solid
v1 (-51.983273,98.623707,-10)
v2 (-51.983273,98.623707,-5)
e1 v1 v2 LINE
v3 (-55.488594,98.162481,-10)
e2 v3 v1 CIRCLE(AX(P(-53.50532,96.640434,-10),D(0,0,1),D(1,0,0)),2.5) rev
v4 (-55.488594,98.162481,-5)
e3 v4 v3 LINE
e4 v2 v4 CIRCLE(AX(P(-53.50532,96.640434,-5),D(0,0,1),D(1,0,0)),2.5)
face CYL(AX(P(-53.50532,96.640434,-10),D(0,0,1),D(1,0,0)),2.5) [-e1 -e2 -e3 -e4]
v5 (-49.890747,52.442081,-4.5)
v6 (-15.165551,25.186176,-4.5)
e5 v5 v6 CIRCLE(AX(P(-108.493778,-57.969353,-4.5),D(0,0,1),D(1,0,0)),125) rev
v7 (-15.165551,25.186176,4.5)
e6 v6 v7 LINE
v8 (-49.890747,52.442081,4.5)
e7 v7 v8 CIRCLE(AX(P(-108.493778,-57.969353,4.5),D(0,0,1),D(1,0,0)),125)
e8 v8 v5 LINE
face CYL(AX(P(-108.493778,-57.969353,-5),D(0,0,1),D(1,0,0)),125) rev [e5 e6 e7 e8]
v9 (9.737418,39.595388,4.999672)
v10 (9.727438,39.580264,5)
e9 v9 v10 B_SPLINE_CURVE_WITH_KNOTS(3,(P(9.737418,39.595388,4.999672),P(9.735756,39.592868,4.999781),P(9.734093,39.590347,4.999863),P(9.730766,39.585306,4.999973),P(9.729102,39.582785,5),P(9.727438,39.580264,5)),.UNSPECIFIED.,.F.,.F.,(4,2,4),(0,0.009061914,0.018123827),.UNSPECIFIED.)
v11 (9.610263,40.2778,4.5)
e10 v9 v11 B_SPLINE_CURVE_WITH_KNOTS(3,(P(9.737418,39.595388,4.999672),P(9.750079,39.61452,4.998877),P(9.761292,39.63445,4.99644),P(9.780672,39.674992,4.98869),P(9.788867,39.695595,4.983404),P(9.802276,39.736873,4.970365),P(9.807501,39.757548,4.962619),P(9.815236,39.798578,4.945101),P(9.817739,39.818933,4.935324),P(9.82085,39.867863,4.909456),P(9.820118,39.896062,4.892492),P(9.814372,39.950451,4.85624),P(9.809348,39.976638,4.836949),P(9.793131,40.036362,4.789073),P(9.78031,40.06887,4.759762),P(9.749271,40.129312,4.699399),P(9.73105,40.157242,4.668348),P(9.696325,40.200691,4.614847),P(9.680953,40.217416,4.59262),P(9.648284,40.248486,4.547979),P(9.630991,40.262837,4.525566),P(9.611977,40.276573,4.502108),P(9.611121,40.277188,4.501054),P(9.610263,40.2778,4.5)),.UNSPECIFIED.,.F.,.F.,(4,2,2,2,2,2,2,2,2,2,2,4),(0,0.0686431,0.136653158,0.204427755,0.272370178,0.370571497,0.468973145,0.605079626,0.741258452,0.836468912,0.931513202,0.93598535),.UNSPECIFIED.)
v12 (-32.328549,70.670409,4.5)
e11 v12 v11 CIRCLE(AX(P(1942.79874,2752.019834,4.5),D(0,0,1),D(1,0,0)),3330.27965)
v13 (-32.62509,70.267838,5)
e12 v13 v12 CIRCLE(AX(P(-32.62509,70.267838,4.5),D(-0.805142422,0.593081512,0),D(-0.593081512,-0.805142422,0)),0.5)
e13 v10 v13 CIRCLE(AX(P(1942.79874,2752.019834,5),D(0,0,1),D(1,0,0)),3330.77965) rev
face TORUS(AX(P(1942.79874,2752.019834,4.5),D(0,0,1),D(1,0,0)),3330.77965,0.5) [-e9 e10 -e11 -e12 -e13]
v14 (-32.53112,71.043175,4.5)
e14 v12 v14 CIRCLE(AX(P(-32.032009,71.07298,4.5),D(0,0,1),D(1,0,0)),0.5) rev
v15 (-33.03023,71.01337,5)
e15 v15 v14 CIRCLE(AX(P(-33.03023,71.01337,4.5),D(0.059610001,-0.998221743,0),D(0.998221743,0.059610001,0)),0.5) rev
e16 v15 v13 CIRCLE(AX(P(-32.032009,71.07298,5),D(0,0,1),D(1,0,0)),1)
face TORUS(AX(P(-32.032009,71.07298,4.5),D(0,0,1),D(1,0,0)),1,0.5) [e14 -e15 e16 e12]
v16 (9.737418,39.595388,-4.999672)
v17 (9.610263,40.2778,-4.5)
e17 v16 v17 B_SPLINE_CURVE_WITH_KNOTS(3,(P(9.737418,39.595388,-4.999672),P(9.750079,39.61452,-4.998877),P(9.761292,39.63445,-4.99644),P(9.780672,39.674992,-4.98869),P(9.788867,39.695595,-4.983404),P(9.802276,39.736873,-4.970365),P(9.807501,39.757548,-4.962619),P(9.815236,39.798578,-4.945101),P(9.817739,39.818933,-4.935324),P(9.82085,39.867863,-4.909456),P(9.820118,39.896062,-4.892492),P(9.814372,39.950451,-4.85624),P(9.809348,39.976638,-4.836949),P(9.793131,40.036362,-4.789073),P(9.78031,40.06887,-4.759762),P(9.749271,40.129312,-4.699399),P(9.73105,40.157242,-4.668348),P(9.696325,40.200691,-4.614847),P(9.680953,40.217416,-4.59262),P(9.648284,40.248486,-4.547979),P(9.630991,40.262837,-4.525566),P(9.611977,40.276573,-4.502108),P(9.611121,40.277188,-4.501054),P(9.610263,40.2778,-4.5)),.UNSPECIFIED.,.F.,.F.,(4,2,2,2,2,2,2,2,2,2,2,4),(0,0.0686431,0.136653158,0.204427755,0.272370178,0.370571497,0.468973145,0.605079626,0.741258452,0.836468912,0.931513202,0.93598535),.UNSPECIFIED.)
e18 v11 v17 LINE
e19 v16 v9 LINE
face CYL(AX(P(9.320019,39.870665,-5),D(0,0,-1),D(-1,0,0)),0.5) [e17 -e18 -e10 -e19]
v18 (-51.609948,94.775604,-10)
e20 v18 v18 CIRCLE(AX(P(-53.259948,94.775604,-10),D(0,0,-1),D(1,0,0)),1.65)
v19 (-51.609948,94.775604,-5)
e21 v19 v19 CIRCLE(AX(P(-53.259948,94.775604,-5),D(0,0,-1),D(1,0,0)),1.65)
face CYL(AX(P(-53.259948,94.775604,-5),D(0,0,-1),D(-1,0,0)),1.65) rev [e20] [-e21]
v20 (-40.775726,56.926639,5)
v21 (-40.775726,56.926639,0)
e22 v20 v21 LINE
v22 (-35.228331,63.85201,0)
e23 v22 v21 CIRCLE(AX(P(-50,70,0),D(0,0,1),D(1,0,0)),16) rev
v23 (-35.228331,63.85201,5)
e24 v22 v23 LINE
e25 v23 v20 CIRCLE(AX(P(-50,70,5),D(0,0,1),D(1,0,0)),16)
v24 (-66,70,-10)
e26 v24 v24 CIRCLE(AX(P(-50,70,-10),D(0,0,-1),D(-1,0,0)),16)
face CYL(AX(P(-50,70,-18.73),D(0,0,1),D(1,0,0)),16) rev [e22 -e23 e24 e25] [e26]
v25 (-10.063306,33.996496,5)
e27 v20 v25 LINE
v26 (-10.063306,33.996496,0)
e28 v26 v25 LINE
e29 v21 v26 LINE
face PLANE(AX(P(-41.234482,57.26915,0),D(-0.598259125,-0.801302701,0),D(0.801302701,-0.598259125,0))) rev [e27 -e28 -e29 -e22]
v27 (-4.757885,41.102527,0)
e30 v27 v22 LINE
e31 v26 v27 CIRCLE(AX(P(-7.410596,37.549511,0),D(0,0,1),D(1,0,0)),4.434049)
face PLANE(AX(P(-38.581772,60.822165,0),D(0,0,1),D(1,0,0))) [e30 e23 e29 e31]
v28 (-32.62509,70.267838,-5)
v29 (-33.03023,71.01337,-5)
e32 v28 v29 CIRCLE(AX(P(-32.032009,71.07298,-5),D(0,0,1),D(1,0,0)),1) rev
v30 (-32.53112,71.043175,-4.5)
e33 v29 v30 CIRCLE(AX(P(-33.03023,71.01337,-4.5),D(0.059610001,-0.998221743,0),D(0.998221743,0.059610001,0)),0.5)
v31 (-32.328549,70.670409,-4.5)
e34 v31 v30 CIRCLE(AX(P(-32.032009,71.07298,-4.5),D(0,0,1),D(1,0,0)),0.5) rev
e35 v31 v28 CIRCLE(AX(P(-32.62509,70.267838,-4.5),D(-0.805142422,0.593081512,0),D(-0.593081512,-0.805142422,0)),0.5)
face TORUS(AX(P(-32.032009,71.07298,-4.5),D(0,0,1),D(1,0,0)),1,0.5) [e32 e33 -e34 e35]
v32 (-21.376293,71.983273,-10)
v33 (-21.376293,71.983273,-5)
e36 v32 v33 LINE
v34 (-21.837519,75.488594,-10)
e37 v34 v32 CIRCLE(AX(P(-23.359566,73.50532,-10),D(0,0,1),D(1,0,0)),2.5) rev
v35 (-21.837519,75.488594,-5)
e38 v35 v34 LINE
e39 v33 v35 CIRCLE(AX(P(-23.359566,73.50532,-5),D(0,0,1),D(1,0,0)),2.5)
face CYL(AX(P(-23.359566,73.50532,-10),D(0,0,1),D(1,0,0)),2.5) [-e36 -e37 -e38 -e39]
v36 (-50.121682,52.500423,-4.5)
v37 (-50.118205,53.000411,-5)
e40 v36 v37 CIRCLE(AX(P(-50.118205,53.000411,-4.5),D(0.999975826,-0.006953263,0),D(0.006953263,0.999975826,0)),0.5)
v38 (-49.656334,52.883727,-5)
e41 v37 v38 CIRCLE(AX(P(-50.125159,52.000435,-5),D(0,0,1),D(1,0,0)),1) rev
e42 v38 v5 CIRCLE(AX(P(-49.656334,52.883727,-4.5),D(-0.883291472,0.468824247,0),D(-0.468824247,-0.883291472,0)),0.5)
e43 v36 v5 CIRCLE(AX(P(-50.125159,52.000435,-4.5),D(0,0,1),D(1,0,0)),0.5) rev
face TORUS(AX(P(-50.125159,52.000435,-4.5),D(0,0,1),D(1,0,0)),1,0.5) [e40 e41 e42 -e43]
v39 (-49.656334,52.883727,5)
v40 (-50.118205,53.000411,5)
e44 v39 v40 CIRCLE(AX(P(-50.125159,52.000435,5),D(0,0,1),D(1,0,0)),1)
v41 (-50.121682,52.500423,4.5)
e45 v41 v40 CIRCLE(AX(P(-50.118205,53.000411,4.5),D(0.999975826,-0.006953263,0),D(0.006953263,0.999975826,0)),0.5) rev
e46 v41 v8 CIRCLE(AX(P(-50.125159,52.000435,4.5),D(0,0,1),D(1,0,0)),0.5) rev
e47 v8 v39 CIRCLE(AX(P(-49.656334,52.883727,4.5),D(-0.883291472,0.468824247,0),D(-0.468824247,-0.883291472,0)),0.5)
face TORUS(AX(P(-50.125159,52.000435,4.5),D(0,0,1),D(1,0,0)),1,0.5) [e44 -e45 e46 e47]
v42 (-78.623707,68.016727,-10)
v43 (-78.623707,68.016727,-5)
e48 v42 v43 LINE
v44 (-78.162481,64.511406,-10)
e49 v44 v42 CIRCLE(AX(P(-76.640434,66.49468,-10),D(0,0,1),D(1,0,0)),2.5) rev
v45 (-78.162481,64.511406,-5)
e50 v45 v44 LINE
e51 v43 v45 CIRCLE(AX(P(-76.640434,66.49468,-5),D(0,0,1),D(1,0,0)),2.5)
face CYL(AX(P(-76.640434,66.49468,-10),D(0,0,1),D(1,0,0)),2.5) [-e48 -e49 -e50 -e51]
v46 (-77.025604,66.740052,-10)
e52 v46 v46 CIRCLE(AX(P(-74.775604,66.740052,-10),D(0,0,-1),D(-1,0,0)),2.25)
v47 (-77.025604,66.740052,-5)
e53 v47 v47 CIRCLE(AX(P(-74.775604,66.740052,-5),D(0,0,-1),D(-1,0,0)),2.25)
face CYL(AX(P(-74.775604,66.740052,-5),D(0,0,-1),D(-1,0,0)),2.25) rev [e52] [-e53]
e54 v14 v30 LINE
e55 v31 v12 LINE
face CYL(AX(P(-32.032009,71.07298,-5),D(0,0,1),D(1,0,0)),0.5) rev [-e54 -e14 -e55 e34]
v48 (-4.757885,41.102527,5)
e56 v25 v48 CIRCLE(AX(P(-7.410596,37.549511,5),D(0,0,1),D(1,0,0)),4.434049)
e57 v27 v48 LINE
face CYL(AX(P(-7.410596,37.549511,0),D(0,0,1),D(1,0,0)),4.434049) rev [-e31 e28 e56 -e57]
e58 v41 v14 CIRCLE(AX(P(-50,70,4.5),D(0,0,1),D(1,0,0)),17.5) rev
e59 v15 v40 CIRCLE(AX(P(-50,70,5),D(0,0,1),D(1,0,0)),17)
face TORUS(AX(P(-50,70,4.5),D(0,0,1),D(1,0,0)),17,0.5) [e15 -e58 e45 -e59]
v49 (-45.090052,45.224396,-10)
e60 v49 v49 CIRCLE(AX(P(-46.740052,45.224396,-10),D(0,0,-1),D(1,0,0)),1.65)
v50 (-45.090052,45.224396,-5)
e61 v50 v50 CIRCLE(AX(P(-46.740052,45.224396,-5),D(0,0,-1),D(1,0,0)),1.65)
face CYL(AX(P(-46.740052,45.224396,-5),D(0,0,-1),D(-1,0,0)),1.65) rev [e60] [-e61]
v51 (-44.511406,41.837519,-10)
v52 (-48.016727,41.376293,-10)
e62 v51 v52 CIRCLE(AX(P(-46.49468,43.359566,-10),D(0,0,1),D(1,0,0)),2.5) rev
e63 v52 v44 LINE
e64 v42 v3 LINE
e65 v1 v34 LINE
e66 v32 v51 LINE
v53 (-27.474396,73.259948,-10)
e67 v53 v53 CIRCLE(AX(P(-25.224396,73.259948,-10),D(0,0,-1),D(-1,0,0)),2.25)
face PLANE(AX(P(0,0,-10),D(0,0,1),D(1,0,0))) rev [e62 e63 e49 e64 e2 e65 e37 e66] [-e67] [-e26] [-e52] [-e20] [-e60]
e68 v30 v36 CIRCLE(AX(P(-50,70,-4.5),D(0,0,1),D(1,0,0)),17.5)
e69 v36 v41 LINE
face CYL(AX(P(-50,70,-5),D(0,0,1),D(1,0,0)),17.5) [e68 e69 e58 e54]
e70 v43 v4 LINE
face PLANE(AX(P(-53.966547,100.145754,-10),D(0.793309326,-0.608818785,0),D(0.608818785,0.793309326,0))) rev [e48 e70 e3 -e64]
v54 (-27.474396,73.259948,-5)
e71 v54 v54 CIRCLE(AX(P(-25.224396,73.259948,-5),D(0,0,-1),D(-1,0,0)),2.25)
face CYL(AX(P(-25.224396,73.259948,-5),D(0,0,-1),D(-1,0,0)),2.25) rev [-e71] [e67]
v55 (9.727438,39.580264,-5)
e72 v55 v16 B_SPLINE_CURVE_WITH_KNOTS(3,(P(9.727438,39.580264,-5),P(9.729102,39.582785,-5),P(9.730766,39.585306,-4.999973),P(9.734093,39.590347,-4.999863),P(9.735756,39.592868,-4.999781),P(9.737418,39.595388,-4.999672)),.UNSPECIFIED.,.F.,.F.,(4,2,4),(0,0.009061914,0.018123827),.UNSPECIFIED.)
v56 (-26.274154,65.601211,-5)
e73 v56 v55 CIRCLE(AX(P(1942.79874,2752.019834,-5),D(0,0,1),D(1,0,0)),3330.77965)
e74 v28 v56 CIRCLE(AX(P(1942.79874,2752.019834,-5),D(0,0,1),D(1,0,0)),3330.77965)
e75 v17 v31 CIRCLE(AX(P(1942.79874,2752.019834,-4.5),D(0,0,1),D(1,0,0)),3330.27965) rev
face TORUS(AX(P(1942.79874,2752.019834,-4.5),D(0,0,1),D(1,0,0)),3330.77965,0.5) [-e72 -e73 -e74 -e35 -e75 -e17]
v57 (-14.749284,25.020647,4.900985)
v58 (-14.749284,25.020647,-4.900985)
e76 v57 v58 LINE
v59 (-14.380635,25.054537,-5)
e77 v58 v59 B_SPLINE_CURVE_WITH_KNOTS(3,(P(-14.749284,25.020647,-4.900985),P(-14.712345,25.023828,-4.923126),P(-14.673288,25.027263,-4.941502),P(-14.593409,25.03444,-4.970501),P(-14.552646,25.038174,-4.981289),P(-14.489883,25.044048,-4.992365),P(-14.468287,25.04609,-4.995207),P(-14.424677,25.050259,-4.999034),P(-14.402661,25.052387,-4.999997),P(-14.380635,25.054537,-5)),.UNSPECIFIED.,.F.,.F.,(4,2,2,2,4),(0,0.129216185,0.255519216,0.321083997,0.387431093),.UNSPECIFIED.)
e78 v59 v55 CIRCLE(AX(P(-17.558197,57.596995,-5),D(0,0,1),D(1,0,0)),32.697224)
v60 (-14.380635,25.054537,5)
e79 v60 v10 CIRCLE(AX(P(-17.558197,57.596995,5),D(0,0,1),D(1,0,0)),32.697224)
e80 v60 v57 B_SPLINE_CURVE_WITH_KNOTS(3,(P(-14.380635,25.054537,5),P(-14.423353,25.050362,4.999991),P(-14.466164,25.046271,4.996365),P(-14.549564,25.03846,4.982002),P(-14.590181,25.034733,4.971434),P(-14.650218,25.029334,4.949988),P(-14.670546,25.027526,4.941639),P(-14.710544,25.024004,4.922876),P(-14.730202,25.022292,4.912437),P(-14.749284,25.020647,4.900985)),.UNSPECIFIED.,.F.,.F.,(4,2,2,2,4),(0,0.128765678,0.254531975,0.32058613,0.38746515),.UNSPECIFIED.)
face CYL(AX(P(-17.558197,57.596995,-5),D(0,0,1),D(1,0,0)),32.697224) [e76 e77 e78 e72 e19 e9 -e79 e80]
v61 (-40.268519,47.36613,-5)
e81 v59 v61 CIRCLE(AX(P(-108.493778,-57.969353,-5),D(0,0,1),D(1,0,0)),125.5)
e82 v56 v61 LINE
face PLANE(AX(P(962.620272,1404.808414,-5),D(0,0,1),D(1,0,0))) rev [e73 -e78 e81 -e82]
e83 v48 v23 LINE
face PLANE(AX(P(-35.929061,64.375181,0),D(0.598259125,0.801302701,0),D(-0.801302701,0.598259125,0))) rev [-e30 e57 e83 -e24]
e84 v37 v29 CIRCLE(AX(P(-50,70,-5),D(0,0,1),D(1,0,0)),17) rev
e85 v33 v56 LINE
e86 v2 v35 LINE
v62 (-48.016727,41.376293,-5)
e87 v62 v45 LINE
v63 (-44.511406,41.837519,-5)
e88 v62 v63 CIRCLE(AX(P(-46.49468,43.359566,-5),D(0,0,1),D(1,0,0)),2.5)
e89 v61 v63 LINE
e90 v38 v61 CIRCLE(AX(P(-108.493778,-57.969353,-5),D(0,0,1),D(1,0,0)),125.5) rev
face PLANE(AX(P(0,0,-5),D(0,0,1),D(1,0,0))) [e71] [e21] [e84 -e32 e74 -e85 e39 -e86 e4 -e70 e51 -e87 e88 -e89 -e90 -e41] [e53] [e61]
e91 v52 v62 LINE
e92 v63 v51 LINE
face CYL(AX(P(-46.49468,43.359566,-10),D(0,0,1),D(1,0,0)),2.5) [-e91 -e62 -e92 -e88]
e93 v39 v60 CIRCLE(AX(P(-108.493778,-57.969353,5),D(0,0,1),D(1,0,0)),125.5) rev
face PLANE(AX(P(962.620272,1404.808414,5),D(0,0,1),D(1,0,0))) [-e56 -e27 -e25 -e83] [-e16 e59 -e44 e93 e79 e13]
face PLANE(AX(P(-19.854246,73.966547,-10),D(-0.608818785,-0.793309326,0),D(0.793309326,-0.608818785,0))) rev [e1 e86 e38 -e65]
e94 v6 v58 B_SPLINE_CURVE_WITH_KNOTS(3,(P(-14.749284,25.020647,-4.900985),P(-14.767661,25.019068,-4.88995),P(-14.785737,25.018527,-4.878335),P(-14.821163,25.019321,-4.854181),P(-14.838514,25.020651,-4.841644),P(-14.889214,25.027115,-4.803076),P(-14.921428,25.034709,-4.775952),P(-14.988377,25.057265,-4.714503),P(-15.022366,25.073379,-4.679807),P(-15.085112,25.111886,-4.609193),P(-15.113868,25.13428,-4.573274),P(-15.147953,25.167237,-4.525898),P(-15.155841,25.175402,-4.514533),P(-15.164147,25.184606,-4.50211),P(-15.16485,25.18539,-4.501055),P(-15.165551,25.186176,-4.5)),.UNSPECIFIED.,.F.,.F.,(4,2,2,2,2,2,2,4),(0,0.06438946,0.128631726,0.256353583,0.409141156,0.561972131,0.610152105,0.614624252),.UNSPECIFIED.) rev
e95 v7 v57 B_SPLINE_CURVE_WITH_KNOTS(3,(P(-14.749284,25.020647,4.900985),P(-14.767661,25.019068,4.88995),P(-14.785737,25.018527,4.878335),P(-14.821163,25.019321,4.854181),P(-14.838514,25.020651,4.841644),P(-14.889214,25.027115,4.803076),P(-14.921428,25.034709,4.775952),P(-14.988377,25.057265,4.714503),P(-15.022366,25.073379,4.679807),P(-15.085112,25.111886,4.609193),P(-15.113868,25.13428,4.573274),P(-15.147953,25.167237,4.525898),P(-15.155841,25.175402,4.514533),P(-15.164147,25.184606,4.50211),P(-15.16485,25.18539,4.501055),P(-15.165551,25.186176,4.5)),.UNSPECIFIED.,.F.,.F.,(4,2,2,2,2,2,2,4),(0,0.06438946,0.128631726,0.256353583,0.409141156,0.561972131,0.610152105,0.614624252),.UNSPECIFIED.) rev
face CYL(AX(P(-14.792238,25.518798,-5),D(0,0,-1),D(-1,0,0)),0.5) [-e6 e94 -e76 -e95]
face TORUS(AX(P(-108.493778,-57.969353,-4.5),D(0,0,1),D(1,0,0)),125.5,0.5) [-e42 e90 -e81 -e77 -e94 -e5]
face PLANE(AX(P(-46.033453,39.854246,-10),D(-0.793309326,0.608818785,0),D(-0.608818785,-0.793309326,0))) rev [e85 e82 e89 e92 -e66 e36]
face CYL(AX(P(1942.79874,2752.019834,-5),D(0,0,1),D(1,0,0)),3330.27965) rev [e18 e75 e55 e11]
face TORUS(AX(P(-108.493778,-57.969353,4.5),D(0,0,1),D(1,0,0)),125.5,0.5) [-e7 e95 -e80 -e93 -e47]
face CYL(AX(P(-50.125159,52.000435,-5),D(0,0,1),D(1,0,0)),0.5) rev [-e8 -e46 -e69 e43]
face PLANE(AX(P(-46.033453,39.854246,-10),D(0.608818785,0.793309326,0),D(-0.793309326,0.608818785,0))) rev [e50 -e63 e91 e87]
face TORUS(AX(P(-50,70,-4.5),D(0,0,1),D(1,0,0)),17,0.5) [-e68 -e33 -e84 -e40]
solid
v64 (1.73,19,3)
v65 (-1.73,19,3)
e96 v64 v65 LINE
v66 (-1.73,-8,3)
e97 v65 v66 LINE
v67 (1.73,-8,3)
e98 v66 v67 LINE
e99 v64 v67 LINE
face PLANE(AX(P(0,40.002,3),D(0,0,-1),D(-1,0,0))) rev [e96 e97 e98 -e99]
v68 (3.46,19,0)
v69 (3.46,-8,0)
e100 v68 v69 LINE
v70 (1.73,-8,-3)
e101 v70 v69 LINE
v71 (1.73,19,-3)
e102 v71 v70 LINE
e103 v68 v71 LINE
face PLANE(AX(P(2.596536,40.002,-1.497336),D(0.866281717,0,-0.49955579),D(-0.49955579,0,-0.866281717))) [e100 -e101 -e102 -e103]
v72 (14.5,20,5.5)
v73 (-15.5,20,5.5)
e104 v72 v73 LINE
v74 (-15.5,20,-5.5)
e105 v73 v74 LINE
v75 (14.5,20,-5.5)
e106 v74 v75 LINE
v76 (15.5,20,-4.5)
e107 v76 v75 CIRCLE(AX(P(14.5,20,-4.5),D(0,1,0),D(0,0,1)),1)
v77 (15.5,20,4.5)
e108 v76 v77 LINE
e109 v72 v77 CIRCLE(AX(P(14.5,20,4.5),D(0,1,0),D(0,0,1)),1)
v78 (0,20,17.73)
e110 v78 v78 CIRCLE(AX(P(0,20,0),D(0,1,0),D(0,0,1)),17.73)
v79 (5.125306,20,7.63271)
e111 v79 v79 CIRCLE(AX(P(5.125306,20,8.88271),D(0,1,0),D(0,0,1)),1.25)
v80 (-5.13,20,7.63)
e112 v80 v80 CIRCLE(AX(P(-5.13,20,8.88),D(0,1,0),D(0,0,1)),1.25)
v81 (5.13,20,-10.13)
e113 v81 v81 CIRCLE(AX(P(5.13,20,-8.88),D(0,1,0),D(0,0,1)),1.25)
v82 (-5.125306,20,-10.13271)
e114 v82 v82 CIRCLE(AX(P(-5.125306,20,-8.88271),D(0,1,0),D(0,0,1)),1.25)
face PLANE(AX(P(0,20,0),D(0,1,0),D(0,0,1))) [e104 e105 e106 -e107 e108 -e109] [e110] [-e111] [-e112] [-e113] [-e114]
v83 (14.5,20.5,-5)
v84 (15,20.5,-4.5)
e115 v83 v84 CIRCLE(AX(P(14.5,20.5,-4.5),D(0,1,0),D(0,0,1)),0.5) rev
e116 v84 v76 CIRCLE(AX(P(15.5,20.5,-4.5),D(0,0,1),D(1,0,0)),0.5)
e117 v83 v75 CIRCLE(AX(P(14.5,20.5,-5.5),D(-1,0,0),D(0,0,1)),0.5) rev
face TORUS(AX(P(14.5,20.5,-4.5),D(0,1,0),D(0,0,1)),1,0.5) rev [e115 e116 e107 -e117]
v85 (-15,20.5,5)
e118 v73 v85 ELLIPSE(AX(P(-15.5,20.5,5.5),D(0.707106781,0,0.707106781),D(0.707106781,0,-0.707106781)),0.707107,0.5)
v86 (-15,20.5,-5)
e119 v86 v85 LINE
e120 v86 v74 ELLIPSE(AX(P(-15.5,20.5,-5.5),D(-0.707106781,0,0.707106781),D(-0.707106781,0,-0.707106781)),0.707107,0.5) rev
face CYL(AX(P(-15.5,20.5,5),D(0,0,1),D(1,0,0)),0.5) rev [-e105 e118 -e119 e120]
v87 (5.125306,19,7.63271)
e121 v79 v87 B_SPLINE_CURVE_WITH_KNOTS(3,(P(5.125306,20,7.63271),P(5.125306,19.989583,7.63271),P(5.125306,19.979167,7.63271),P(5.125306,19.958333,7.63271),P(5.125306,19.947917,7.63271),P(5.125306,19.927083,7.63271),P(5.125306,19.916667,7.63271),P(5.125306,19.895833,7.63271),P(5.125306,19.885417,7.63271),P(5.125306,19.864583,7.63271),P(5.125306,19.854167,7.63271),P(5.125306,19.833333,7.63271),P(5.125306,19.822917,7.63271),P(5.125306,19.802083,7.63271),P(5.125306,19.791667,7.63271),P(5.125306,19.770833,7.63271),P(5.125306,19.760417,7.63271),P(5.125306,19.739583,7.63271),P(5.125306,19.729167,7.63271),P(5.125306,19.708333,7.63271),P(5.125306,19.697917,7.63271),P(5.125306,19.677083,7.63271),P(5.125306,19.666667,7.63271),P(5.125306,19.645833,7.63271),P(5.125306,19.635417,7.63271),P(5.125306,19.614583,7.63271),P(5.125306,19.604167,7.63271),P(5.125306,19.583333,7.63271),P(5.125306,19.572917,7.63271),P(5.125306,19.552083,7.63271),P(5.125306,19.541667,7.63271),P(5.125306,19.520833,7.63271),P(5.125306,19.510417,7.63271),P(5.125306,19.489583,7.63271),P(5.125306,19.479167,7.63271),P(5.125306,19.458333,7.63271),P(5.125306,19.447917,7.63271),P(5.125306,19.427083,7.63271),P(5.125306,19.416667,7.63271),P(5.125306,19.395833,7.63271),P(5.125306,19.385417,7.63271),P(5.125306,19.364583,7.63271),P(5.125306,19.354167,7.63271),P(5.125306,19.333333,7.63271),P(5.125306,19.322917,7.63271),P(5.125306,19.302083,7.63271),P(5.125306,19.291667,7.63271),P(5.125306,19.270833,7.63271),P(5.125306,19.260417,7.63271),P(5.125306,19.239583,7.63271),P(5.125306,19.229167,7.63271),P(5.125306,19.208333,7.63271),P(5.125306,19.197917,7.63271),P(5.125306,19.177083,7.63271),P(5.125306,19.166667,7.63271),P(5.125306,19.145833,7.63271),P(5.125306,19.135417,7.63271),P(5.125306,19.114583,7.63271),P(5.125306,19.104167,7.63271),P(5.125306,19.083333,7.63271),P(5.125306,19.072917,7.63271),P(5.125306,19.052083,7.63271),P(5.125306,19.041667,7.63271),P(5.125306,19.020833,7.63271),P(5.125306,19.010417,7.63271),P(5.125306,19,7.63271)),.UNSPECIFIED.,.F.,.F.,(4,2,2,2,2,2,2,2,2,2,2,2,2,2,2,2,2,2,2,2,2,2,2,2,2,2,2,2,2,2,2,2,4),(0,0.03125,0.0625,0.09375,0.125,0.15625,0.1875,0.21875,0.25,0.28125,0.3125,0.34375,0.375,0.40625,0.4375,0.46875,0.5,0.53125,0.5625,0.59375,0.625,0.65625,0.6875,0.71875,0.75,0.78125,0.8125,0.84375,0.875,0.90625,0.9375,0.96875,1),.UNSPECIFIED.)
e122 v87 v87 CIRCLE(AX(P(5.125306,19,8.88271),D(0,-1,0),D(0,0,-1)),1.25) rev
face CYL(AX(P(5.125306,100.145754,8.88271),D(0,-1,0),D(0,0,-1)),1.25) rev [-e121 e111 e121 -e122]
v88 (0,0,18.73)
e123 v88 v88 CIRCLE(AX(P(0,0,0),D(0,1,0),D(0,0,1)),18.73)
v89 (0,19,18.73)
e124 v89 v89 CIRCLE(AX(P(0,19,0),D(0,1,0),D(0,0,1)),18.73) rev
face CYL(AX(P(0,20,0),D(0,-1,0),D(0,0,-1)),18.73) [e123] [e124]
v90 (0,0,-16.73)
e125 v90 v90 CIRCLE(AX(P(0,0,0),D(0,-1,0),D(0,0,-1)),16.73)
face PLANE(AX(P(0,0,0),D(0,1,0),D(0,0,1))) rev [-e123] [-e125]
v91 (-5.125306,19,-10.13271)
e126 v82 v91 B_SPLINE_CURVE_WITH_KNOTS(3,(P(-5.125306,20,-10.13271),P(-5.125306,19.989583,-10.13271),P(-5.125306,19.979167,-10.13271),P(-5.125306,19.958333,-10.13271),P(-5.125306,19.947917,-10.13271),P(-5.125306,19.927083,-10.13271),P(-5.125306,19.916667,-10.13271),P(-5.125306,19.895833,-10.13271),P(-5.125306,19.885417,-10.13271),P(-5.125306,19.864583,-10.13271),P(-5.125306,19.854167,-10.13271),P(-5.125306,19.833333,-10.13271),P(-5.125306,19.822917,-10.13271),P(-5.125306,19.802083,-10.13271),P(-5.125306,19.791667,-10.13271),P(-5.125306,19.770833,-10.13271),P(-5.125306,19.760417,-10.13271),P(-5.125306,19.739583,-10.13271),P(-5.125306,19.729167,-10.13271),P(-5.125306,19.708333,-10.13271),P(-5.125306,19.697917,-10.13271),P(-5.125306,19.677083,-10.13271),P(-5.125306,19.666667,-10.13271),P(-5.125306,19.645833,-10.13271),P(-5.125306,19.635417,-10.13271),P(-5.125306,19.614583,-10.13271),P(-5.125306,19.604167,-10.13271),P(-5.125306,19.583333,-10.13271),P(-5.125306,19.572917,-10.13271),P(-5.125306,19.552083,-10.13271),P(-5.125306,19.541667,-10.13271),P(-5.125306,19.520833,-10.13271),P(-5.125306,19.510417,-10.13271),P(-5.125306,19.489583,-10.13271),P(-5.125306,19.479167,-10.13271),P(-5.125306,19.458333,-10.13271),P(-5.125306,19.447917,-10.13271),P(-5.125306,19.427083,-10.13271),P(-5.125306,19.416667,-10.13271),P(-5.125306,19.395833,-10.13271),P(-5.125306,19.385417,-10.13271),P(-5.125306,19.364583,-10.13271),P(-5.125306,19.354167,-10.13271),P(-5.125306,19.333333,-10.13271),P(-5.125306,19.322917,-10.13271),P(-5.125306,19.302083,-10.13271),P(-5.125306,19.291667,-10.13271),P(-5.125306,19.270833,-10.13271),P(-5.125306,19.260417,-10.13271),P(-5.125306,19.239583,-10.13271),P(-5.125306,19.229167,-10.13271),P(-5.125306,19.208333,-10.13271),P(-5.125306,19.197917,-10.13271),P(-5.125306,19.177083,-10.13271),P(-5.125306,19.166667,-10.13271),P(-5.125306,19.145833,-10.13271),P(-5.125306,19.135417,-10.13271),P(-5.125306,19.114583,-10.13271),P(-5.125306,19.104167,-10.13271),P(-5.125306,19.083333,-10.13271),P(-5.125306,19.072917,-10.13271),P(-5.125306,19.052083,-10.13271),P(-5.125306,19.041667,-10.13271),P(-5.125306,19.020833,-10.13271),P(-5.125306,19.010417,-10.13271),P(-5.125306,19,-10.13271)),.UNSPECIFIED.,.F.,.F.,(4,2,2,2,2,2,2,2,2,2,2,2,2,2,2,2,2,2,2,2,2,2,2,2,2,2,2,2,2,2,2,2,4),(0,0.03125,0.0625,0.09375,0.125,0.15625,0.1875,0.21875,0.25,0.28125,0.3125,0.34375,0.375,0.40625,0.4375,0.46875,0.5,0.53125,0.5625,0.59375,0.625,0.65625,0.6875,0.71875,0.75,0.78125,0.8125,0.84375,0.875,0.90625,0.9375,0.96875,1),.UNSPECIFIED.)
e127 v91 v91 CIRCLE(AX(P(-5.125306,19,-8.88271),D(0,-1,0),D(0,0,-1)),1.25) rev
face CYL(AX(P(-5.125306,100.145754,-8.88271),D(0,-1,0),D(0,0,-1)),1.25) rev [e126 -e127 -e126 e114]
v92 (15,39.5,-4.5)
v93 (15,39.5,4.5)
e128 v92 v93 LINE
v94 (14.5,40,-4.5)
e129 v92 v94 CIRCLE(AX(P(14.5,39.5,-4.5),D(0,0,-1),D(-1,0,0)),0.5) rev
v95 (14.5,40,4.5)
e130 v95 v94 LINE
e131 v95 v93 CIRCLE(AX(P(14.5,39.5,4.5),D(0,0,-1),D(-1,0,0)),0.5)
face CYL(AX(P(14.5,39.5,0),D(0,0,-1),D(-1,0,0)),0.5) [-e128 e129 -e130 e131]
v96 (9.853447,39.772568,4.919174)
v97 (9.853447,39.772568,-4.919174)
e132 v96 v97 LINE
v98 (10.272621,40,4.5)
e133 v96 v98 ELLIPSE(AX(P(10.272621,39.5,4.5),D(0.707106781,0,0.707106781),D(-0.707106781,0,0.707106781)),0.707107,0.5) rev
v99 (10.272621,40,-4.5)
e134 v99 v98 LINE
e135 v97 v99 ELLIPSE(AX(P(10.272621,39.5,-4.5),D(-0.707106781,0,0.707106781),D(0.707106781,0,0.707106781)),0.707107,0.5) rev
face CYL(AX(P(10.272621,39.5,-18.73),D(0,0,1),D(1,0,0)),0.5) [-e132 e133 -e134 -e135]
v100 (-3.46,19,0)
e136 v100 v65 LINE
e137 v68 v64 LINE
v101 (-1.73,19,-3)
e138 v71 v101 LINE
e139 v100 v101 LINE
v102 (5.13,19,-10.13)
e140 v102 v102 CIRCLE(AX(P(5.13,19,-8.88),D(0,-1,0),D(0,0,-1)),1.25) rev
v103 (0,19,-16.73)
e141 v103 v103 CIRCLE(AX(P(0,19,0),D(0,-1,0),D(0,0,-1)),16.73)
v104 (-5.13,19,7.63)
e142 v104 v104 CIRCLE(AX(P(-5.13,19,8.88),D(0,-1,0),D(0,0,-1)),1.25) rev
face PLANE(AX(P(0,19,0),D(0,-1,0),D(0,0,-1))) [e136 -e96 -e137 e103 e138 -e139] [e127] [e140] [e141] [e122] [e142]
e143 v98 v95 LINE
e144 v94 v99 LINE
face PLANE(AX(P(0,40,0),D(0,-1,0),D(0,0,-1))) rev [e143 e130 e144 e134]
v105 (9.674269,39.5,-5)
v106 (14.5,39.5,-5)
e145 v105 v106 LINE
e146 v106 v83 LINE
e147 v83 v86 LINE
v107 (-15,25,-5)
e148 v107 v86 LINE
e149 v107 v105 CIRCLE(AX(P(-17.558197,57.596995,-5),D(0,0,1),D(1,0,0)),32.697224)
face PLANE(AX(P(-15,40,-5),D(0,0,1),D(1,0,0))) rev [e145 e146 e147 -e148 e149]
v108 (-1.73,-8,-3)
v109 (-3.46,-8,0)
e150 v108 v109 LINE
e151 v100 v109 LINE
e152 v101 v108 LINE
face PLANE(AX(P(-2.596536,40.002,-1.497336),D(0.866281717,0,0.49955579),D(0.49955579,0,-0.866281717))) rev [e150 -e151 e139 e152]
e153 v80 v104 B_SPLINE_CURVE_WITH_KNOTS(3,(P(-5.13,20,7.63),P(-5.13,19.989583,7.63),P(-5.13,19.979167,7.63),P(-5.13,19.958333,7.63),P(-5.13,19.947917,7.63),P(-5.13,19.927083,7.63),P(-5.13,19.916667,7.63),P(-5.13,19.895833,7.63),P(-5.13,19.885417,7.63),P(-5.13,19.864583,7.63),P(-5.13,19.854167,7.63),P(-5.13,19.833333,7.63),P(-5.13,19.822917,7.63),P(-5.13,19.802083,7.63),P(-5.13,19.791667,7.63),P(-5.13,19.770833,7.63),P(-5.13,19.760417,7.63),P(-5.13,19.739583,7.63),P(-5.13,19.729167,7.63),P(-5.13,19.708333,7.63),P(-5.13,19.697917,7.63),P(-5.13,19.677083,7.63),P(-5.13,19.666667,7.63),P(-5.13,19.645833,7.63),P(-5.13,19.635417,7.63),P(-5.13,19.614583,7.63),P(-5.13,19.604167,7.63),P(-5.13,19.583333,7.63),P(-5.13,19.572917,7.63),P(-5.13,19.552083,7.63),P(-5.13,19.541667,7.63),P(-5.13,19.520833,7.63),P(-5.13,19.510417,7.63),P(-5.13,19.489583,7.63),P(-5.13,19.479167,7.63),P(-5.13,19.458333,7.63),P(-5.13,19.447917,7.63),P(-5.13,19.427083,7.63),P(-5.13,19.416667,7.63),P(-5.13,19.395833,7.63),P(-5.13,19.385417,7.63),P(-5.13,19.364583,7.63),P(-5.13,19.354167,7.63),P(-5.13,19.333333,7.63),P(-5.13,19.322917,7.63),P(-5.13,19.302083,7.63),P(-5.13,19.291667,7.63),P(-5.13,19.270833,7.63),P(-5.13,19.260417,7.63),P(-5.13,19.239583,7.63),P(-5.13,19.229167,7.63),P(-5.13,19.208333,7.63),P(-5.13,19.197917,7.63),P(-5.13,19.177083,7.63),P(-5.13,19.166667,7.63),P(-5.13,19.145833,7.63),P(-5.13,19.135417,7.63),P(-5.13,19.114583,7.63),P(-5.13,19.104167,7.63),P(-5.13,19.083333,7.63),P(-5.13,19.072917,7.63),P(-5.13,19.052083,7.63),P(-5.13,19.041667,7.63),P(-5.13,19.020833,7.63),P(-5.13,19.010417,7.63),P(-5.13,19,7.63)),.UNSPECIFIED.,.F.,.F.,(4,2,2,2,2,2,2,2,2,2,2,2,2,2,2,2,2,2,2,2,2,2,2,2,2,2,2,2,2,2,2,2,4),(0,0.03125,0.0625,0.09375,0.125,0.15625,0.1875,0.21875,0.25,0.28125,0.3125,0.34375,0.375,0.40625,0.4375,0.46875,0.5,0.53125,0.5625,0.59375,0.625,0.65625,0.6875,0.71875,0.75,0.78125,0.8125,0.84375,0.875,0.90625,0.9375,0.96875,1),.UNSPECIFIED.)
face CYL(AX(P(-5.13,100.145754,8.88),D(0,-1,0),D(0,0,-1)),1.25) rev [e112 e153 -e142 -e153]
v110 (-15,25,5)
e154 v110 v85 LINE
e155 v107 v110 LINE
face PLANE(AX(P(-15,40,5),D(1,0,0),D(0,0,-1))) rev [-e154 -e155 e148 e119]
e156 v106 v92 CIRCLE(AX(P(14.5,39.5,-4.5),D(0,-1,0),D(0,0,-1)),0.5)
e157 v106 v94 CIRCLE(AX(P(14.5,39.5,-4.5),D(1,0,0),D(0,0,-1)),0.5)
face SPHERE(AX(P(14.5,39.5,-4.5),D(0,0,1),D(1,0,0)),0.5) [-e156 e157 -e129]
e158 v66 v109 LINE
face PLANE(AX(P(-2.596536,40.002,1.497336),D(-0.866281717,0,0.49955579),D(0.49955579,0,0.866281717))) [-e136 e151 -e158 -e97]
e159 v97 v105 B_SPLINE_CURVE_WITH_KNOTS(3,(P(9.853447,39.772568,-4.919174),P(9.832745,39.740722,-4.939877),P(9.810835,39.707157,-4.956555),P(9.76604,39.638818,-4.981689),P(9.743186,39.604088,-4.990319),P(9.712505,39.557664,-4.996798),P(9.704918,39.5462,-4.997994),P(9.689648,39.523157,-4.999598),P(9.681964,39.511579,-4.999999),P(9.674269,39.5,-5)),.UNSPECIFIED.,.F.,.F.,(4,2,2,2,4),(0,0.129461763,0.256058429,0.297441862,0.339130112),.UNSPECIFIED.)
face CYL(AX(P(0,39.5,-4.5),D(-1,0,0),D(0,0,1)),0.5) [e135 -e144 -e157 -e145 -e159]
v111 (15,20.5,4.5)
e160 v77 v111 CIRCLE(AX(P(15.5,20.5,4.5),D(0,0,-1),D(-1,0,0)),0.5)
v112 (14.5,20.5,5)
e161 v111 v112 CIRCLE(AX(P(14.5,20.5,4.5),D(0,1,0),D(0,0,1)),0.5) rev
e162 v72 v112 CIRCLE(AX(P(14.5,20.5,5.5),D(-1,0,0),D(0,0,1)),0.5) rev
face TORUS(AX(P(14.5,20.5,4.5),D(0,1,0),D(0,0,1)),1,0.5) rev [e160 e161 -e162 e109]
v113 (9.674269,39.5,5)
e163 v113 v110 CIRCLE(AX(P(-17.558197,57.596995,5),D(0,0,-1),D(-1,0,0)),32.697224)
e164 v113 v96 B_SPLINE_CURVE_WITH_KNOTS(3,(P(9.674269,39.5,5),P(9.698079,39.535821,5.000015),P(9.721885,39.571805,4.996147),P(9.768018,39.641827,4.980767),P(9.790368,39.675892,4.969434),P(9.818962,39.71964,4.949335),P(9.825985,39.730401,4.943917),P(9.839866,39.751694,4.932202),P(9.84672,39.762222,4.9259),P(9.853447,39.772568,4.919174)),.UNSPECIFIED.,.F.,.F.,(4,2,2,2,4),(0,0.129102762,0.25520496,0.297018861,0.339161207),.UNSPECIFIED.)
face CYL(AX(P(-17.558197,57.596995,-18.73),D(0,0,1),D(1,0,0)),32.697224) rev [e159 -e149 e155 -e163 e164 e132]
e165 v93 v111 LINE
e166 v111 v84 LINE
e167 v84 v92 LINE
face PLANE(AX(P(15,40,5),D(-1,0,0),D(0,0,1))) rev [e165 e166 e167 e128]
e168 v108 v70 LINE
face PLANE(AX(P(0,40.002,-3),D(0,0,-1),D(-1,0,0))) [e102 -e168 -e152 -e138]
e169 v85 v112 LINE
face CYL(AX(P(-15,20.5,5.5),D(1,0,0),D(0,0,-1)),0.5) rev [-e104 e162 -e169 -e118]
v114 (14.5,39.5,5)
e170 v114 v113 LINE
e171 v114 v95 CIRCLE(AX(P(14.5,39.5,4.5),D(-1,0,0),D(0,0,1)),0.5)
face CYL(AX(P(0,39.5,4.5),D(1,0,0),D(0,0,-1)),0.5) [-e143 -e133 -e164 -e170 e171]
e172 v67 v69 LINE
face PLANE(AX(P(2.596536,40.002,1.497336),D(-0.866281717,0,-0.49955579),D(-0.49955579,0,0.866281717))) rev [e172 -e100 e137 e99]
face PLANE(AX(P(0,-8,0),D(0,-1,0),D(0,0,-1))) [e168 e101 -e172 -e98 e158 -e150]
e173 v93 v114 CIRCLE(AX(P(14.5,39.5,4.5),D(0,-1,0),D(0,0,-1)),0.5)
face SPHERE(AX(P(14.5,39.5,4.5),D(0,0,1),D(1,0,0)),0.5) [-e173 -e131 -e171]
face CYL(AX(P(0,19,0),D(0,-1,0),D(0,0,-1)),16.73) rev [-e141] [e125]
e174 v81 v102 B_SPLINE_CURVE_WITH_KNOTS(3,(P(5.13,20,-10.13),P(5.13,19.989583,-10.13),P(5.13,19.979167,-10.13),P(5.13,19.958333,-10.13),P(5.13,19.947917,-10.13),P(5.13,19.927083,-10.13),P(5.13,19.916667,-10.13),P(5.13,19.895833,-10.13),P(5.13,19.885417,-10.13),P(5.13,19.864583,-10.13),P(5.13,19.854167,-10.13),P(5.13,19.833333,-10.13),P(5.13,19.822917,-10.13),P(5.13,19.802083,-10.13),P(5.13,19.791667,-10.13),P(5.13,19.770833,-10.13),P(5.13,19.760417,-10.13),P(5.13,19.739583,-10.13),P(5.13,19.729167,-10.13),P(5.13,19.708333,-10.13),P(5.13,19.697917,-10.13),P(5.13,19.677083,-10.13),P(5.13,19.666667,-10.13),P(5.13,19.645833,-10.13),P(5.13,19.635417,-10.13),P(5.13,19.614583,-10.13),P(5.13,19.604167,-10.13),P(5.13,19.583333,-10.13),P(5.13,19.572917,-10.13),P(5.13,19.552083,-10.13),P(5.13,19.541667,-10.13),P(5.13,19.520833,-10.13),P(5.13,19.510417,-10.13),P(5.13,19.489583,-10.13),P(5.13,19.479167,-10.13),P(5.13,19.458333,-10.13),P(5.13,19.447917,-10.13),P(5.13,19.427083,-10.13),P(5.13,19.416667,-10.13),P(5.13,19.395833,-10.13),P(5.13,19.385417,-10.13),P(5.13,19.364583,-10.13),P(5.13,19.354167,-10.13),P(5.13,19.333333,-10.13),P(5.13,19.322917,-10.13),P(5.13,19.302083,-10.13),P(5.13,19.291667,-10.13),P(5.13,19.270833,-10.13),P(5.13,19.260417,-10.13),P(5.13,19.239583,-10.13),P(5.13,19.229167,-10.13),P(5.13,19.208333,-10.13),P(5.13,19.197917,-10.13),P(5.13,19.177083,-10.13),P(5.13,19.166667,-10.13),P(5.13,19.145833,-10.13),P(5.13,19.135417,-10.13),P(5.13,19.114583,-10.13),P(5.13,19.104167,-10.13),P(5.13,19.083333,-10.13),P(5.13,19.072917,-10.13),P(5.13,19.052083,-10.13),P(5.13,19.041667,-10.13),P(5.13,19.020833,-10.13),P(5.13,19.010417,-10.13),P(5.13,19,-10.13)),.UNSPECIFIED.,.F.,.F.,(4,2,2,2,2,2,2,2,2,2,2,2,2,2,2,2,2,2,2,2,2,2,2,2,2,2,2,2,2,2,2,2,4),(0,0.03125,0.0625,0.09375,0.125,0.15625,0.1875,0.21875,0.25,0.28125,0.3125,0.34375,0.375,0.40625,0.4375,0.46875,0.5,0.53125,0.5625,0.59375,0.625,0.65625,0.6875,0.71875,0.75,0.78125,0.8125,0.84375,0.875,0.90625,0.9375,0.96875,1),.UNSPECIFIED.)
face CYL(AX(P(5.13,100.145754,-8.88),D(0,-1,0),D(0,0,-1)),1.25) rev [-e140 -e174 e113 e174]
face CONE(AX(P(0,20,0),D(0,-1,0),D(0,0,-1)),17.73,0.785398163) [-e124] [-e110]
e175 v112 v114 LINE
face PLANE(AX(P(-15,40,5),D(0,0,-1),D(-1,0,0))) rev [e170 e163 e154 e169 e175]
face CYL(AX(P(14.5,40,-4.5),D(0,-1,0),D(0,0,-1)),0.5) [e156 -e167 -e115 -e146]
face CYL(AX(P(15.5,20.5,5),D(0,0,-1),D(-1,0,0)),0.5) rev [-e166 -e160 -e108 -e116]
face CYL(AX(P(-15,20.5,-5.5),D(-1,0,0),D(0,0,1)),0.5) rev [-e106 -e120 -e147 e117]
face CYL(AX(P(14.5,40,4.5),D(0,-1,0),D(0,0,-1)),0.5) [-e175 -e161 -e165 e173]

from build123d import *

# Parameters (mm, degrees)
SKETCH1_R               = 18.73
BOSS_EXTRUDE1_DEPTH     = 20
CHAMFER1_SIZE           = 1
SKETCH2_W               = 30
SKETCH2_H               = 10
BOSS_EXTRUDE2_DEPTH     = 20
CUT_EXTRUDE1_DEPTH      = 51.13906461
CUT_EXTRUDE1_DEPTH_BACK = 51.13906461
BOSS_EXTRUDE3_DEPTH     = 5
FILLET1_R               = 0.5
FILLET2_R               = 0.5
FILLET3_R               = 0.5
CUT_EXTRUDE2_DEPTH      = 114.029256969
CUT_EXTRUDE2_DEPTH_BACK = 114.029256969
SKETCH8_R               = 16
SKETCH9_R               = 16
BOSS_EXTRUDE6_DEPTH     = 5
SKETCH11_R              = 1.65
SKETCH11_R_2            = 2.25
CUT_EXTRUDE4_DEPTH      = 5
CUT_EXTRUDE5_DEPTH      = 5
SKETCH13_R              = 1.25
CUT_EXTRUDE6_DEPTH      = 130.627647397
SKETCH15_R              = 16.73
CUT_EXTRUDE8_DEPTH      = 19
BOSS_EXTRUDE7_REACH     = 131.628
BOSS_EXTRUDE8_DEPTH     = 8
FILLET4_R               = 2.5


with BuildPart() as part:
    # Sketch1 → Boss-Extrude1 (new body)
    with BuildSketch(Plane(origin=(0, 0, 0), x_dir=(1, 0, 0), z_dir=(0, 1, 0))):
        with Locations(Location((0, 0, 0), (0, 0, 270))):
            Circle(SKETCH1_R)
    extrude(amount=BOSS_EXTRUDE1_DEPTH)

    # Chamfer1
    chamfer1_edges = [part.edges().sort_by_distance(p)[0] for p in [
        (0, 20, -18.73),
    ]]
    chamfer(chamfer1_edges, length=CHAMFER1_SIZE)

    # Sketch2 → Boss-Extrude2 (add)
    with BuildSketch(Plane(origin=(0, 20, 0), x_dir=(1, 0, 0), z_dir=(0, 1, 0))):
        Rectangle(SKETCH2_W, SKETCH2_H)
    extrude(amount=BOSS_EXTRUDE2_DEPTH)

    # Sketch3 → Cut-Extrude1 (cut, two sides: drawn at the far end of the back side and taken through both)
    with BuildSketch(Plane.XY.offset(5).offset(-CUT_EXTRUDE1_DEPTH_BACK)):
        with BuildLine():
            Line((-15, 40), (10, 40))
            ThreePointArc((10, 40), (-0.735614041, 29.559356734), (-15, 25))
            Line((-15, 25), (-15, 40))
        make_face()
    extrude(amount=CUT_EXTRUDE1_DEPTH + CUT_EXTRUDE1_DEPTH_BACK, mode=Mode.SUBTRACT)

    # Fillet1
    fillet1_edges = [part.edges().sort_by_distance(p)[0] for p in [
        (15, 20, 0),
        (15, 30, 5),
        (0, 20, -5),
        (15, 30, -5),
        (-15, 20, 0),
        (0, 20, 5),
        (15, 40, 0),
    ]]
    fillet(fillet1_edges, radius=FILLET1_R)

    # Fillet2
    # the kernel refuses this fillet: 0.5 mm, written as the material it takes off along each edge
    with BuildSketch(Plane(origin=(14.5, 39.5, -4.5), x_dir=(0, 1, 0), z_dir=(0, 0, -1))) as fillet2_piece_1_section:
        Polygon((0, 0), (FILLET2_R, 0), (FILLET2_R, FILLET2_R), (0, FILLET2_R), align=None)
    fillet2_piece_1 = extrude(amount=FILLET2_R, mode=Mode.PRIVATE)
    fillet2_piece_1 = fillet2_piece_1 - Plane(origin=(14.5, 39.5, -4.5), x_dir=(-0.7071067811865475, -0.7071067811865475, 0), z_dir=(0, 0, -1)) * Sphere(FILLET2_R, mode=Mode.PRIVATE)
    add(fillet2_piece_1, mode=Mode.SUBTRACT)
    with BuildSketch(Plane(origin=(14.5, 39.5, 4.5), x_dir=(0, 1, 0), z_dir=(0, 0, 1))) as fillet2_piece_2_section:
        Polygon((0, 0), (FILLET2_R, 0), (FILLET2_R, -FILLET2_R), (0, -FILLET2_R), align=None)
    fillet2_piece_2 = extrude(amount=FILLET2_R, mode=Mode.PRIVATE)
    fillet2_piece_2 = fillet2_piece_2 - Plane(origin=(14.5, 39.5, 4.5), x_dir=(-0.7071067811865475, -0.7071067811865475, 0), z_dir=(0, 0, 1)) * Sphere(FILLET2_R, mode=Mode.PRIVATE)
    add(fillet2_piece_2, mode=Mode.SUBTRACT)
    with BuildSketch(Plane(origin=(8.75, 40, 5), x_dir=(0, -1, 0), z_dir=(1, 0, 0)), Plane(origin=(14.5, 40, -5), x_dir=(0, -1, 0), z_dir=(-1, 0, 0))) as fillet2_piece_3:
        with BuildLine():
            CenterArc((FILLET2_R, FILLET2_R), FILLET2_R, 180, 90)
            Line((0, FILLET2_R), (0, 0))
            Line((0, 0), (FILLET2_R, 0))
        make_face()
    extrude(amount=5.75, mode=Mode.SUBTRACT)
    with BuildSketch(Plane(origin=(10, 40, -5.681553415), x_dir=(1, 0, 0), z_dir=(0, 0, 1))) as fillet2_piece_4:
        with BuildLine():
            CenterArc((0.272621366, -0.5), FILLET2_R, 90, 56.96605651)
            ThreePointArc((-0.146552515, -0.227432105), (-0.073041014, -0.113867639), (0, 0))
            Line((0, 0), (0.272621366, 0))
        make_face()
    extrude(amount=11.36310683, mode=Mode.SUBTRACT)

    # Sketch13 → Cut-Extrude6 (cut, through all)
    with BuildSketch(Plane.XZ):
        with Locations(Location((-5.13, 8.88, 0), (0, 0, 270))):
            Circle(SKETCH13_R)
        with Locations(Location((5.125305586, 8.882710321, 0), (0, 0, 270))):
            Circle(SKETCH13_R)
        with Locations(Location((5.13, -8.88, 0), (0, 0, 270))):
            Circle(SKETCH13_R)
        with Locations(Location((-5.125305586, -8.882710321, 0), (0, 0, 270))):
            Circle(SKETCH13_R)
    extrude(amount=-CUT_EXTRUDE6_DEPTH, mode=Mode.SUBTRACT)

    # Sketch15 → Cut-Extrude8 (cut)
    with BuildSketch(Plane.XZ):
        with Locations(Location((0, 0, 0), (0, 0, 270))):
            Circle(SKETCH15_R)
    extrude(amount=-CUT_EXTRUDE8_DEPTH, mode=Mode.SUBTRACT)

    # Sketch15<5> → Boss-Extrude7 (add, up to next)
    with BuildSketch(Plane.XZ, mode=Mode.PRIVATE) as boss_extrude7_sk1:
        Polygon((-1.73, 3), (1.73, 3), (3.46, 0), (1.73, -3), (-1.73, -3), (-3.46, 0), align=None)
    boss_extrude7_tool1 = extrude(boss_extrude7_sk1.sketch, amount=-BOSS_EXTRUDE7_REACH, mode=Mode.PRIVATE) - part.part
    add(boss_extrude7_tool1.solids().sort_by_distance((0, 0, 0))[0])

    # Sketch15<7> → Boss-Extrude8 (add)
    with BuildSketch(Plane.XZ):
        Polygon((-1.73, 3), (1.73, 3), (3.46, 0), (1.73, -3), (-1.73, -3), (-3.46, 0), align=None)
    extrude(amount=BOSS_EXTRUDE8_DEPTH)


with BuildPart() as body_2:
    # Sketch4 → Boss-Extrude3 (new, symmetric)
    with BuildSketch(Plane.XY):
        with BuildLine():
            ThreePointArc((-32.518781125, 70.810547124), (-62.657696763, 82.084399558), (-50, 52.5))
            ThreePointArc((-50, 52.5), (-31.266083512, 40.320439167), (-15, 25))
            ThreePointArc((-15, 25), (-0.735614041, 29.559356734), (10, 40))
            ThreePointArc((10, 40), (-11.320115155, 55.321473179), (-32.518781125, 70.810547124))
        make_face()
    extrude(amount=BOSS_EXTRUDE3_DEPTH, both=True)

    # Fillet3
    fillet3_edges = [body_2.edges().sort_by_distance(p)[0] for p in [
        (-62.657696763, 82.084399558, -5),
        (-31.266083512, 40.320439167, -5),
        (-31.266083512, 40.320439167, 5),
        (-62.657696763, 82.084399558, 5),
        (-11.320115155, 55.321473179, 5),
        (-15, 25, 0),
        (-50, 52.5, 0),
        (-32.518781125, 70.810547124, 0),
        (10, 40, 0),
        (-11.320115155, 55.321473179, -5),
    ]]
    fillet(fillet3_edges, radius=FILLET3_R)

    # Sketch8 → Cut-Extrude2 (cut, two sides: drawn at the far end of the back side and taken through both)
    with BuildSketch(Plane.XY.offset(5).offset(-CUT_EXTRUDE2_DEPTH_BACK)):
        with Locations((-50, 70)):
            Circle(SKETCH8_R)
    extrude(amount=CUT_EXTRUDE2_DEPTH + CUT_EXTRUDE2_DEPTH_BACK, mode=Mode.SUBTRACT)

    # Sketch9 → Boss-Extrude6 (add)
    with BuildSketch(Plane(origin=(0, 0, -5), x_dir=(-1, 0, 0), z_dir=(0, 0, -1))):
        Polygon((46.03345337, 39.854245609), (80.145754391, 66.03345337), (53.96654663, 100.145754391), (19.854245609, 73.96654663), align=None)
        with Locations(Location((50, 70, 0), (0, 0, 180))):
            Circle(SKETCH9_R, mode=Mode.SUBTRACT)
    extrude(amount=BOSS_EXTRUDE6_DEPTH)

    # Sketch11 → Cut-Extrude4 (cut)
    with BuildSketch(Plane(origin=(0, 0, -10), x_dir=(-1, 0, 0), z_dir=(0, 0, -1))):
        with Locations(Location((53.259947859, 94.775603725, 0), (0, 0, 180))):
            Circle(SKETCH11_R)
        with Locations(Location((46.740052141, 45.224396275, 0), (0, 0, 180))):
            Circle(SKETCH11_R)
        with Locations((74.775603725, 66.740052141)):
            Circle(SKETCH11_R_2)
        with Locations((25.224396275, 73.259947859)):
            Circle(SKETCH11_R_2)
    extrude(amount=-CUT_EXTRUDE4_DEPTH, mode=Mode.SUBTRACT)

    # Sketch12 → Cut-Extrude5 (cut)
    with BuildSketch(Plane.XY.offset(5)):
        with BuildLine():
            Line((-35.929061366, 64.375180992), (-4.75788526, 41.102526938))
            ThreePointArc((-4.75788526, 41.102526938), (-3.857580068, 34.896801029), (-10.063305977, 33.996495837))
            Line((-10.063305977, 33.996495837), (-41.234482084, 57.269149891))
            ThreePointArc((-41.234482084, 57.269149891), (-42.134787275, 63.4748758), (-35.929061366, 64.375180992))
        make_face()
    extrude(amount=-CUT_EXTRUDE5_DEPTH, mode=Mode.SUBTRACT)

    # Fillet4
    fillet4_edges = [body_2.edges().sort_by_distance(p)[0] for p in [
        (-19.854245609, 73.96654663, -7.5),
        (-46.03345337, 39.854245609, -7.5),
        (-80.145754391, 66.03345337, -7.5),
        (-53.96654663, 100.145754391, -7.5),
    ]]
    fillet(fillet4_edges, radius=FILLET4_R)


solid = Compound([part.part, body_2.part])
